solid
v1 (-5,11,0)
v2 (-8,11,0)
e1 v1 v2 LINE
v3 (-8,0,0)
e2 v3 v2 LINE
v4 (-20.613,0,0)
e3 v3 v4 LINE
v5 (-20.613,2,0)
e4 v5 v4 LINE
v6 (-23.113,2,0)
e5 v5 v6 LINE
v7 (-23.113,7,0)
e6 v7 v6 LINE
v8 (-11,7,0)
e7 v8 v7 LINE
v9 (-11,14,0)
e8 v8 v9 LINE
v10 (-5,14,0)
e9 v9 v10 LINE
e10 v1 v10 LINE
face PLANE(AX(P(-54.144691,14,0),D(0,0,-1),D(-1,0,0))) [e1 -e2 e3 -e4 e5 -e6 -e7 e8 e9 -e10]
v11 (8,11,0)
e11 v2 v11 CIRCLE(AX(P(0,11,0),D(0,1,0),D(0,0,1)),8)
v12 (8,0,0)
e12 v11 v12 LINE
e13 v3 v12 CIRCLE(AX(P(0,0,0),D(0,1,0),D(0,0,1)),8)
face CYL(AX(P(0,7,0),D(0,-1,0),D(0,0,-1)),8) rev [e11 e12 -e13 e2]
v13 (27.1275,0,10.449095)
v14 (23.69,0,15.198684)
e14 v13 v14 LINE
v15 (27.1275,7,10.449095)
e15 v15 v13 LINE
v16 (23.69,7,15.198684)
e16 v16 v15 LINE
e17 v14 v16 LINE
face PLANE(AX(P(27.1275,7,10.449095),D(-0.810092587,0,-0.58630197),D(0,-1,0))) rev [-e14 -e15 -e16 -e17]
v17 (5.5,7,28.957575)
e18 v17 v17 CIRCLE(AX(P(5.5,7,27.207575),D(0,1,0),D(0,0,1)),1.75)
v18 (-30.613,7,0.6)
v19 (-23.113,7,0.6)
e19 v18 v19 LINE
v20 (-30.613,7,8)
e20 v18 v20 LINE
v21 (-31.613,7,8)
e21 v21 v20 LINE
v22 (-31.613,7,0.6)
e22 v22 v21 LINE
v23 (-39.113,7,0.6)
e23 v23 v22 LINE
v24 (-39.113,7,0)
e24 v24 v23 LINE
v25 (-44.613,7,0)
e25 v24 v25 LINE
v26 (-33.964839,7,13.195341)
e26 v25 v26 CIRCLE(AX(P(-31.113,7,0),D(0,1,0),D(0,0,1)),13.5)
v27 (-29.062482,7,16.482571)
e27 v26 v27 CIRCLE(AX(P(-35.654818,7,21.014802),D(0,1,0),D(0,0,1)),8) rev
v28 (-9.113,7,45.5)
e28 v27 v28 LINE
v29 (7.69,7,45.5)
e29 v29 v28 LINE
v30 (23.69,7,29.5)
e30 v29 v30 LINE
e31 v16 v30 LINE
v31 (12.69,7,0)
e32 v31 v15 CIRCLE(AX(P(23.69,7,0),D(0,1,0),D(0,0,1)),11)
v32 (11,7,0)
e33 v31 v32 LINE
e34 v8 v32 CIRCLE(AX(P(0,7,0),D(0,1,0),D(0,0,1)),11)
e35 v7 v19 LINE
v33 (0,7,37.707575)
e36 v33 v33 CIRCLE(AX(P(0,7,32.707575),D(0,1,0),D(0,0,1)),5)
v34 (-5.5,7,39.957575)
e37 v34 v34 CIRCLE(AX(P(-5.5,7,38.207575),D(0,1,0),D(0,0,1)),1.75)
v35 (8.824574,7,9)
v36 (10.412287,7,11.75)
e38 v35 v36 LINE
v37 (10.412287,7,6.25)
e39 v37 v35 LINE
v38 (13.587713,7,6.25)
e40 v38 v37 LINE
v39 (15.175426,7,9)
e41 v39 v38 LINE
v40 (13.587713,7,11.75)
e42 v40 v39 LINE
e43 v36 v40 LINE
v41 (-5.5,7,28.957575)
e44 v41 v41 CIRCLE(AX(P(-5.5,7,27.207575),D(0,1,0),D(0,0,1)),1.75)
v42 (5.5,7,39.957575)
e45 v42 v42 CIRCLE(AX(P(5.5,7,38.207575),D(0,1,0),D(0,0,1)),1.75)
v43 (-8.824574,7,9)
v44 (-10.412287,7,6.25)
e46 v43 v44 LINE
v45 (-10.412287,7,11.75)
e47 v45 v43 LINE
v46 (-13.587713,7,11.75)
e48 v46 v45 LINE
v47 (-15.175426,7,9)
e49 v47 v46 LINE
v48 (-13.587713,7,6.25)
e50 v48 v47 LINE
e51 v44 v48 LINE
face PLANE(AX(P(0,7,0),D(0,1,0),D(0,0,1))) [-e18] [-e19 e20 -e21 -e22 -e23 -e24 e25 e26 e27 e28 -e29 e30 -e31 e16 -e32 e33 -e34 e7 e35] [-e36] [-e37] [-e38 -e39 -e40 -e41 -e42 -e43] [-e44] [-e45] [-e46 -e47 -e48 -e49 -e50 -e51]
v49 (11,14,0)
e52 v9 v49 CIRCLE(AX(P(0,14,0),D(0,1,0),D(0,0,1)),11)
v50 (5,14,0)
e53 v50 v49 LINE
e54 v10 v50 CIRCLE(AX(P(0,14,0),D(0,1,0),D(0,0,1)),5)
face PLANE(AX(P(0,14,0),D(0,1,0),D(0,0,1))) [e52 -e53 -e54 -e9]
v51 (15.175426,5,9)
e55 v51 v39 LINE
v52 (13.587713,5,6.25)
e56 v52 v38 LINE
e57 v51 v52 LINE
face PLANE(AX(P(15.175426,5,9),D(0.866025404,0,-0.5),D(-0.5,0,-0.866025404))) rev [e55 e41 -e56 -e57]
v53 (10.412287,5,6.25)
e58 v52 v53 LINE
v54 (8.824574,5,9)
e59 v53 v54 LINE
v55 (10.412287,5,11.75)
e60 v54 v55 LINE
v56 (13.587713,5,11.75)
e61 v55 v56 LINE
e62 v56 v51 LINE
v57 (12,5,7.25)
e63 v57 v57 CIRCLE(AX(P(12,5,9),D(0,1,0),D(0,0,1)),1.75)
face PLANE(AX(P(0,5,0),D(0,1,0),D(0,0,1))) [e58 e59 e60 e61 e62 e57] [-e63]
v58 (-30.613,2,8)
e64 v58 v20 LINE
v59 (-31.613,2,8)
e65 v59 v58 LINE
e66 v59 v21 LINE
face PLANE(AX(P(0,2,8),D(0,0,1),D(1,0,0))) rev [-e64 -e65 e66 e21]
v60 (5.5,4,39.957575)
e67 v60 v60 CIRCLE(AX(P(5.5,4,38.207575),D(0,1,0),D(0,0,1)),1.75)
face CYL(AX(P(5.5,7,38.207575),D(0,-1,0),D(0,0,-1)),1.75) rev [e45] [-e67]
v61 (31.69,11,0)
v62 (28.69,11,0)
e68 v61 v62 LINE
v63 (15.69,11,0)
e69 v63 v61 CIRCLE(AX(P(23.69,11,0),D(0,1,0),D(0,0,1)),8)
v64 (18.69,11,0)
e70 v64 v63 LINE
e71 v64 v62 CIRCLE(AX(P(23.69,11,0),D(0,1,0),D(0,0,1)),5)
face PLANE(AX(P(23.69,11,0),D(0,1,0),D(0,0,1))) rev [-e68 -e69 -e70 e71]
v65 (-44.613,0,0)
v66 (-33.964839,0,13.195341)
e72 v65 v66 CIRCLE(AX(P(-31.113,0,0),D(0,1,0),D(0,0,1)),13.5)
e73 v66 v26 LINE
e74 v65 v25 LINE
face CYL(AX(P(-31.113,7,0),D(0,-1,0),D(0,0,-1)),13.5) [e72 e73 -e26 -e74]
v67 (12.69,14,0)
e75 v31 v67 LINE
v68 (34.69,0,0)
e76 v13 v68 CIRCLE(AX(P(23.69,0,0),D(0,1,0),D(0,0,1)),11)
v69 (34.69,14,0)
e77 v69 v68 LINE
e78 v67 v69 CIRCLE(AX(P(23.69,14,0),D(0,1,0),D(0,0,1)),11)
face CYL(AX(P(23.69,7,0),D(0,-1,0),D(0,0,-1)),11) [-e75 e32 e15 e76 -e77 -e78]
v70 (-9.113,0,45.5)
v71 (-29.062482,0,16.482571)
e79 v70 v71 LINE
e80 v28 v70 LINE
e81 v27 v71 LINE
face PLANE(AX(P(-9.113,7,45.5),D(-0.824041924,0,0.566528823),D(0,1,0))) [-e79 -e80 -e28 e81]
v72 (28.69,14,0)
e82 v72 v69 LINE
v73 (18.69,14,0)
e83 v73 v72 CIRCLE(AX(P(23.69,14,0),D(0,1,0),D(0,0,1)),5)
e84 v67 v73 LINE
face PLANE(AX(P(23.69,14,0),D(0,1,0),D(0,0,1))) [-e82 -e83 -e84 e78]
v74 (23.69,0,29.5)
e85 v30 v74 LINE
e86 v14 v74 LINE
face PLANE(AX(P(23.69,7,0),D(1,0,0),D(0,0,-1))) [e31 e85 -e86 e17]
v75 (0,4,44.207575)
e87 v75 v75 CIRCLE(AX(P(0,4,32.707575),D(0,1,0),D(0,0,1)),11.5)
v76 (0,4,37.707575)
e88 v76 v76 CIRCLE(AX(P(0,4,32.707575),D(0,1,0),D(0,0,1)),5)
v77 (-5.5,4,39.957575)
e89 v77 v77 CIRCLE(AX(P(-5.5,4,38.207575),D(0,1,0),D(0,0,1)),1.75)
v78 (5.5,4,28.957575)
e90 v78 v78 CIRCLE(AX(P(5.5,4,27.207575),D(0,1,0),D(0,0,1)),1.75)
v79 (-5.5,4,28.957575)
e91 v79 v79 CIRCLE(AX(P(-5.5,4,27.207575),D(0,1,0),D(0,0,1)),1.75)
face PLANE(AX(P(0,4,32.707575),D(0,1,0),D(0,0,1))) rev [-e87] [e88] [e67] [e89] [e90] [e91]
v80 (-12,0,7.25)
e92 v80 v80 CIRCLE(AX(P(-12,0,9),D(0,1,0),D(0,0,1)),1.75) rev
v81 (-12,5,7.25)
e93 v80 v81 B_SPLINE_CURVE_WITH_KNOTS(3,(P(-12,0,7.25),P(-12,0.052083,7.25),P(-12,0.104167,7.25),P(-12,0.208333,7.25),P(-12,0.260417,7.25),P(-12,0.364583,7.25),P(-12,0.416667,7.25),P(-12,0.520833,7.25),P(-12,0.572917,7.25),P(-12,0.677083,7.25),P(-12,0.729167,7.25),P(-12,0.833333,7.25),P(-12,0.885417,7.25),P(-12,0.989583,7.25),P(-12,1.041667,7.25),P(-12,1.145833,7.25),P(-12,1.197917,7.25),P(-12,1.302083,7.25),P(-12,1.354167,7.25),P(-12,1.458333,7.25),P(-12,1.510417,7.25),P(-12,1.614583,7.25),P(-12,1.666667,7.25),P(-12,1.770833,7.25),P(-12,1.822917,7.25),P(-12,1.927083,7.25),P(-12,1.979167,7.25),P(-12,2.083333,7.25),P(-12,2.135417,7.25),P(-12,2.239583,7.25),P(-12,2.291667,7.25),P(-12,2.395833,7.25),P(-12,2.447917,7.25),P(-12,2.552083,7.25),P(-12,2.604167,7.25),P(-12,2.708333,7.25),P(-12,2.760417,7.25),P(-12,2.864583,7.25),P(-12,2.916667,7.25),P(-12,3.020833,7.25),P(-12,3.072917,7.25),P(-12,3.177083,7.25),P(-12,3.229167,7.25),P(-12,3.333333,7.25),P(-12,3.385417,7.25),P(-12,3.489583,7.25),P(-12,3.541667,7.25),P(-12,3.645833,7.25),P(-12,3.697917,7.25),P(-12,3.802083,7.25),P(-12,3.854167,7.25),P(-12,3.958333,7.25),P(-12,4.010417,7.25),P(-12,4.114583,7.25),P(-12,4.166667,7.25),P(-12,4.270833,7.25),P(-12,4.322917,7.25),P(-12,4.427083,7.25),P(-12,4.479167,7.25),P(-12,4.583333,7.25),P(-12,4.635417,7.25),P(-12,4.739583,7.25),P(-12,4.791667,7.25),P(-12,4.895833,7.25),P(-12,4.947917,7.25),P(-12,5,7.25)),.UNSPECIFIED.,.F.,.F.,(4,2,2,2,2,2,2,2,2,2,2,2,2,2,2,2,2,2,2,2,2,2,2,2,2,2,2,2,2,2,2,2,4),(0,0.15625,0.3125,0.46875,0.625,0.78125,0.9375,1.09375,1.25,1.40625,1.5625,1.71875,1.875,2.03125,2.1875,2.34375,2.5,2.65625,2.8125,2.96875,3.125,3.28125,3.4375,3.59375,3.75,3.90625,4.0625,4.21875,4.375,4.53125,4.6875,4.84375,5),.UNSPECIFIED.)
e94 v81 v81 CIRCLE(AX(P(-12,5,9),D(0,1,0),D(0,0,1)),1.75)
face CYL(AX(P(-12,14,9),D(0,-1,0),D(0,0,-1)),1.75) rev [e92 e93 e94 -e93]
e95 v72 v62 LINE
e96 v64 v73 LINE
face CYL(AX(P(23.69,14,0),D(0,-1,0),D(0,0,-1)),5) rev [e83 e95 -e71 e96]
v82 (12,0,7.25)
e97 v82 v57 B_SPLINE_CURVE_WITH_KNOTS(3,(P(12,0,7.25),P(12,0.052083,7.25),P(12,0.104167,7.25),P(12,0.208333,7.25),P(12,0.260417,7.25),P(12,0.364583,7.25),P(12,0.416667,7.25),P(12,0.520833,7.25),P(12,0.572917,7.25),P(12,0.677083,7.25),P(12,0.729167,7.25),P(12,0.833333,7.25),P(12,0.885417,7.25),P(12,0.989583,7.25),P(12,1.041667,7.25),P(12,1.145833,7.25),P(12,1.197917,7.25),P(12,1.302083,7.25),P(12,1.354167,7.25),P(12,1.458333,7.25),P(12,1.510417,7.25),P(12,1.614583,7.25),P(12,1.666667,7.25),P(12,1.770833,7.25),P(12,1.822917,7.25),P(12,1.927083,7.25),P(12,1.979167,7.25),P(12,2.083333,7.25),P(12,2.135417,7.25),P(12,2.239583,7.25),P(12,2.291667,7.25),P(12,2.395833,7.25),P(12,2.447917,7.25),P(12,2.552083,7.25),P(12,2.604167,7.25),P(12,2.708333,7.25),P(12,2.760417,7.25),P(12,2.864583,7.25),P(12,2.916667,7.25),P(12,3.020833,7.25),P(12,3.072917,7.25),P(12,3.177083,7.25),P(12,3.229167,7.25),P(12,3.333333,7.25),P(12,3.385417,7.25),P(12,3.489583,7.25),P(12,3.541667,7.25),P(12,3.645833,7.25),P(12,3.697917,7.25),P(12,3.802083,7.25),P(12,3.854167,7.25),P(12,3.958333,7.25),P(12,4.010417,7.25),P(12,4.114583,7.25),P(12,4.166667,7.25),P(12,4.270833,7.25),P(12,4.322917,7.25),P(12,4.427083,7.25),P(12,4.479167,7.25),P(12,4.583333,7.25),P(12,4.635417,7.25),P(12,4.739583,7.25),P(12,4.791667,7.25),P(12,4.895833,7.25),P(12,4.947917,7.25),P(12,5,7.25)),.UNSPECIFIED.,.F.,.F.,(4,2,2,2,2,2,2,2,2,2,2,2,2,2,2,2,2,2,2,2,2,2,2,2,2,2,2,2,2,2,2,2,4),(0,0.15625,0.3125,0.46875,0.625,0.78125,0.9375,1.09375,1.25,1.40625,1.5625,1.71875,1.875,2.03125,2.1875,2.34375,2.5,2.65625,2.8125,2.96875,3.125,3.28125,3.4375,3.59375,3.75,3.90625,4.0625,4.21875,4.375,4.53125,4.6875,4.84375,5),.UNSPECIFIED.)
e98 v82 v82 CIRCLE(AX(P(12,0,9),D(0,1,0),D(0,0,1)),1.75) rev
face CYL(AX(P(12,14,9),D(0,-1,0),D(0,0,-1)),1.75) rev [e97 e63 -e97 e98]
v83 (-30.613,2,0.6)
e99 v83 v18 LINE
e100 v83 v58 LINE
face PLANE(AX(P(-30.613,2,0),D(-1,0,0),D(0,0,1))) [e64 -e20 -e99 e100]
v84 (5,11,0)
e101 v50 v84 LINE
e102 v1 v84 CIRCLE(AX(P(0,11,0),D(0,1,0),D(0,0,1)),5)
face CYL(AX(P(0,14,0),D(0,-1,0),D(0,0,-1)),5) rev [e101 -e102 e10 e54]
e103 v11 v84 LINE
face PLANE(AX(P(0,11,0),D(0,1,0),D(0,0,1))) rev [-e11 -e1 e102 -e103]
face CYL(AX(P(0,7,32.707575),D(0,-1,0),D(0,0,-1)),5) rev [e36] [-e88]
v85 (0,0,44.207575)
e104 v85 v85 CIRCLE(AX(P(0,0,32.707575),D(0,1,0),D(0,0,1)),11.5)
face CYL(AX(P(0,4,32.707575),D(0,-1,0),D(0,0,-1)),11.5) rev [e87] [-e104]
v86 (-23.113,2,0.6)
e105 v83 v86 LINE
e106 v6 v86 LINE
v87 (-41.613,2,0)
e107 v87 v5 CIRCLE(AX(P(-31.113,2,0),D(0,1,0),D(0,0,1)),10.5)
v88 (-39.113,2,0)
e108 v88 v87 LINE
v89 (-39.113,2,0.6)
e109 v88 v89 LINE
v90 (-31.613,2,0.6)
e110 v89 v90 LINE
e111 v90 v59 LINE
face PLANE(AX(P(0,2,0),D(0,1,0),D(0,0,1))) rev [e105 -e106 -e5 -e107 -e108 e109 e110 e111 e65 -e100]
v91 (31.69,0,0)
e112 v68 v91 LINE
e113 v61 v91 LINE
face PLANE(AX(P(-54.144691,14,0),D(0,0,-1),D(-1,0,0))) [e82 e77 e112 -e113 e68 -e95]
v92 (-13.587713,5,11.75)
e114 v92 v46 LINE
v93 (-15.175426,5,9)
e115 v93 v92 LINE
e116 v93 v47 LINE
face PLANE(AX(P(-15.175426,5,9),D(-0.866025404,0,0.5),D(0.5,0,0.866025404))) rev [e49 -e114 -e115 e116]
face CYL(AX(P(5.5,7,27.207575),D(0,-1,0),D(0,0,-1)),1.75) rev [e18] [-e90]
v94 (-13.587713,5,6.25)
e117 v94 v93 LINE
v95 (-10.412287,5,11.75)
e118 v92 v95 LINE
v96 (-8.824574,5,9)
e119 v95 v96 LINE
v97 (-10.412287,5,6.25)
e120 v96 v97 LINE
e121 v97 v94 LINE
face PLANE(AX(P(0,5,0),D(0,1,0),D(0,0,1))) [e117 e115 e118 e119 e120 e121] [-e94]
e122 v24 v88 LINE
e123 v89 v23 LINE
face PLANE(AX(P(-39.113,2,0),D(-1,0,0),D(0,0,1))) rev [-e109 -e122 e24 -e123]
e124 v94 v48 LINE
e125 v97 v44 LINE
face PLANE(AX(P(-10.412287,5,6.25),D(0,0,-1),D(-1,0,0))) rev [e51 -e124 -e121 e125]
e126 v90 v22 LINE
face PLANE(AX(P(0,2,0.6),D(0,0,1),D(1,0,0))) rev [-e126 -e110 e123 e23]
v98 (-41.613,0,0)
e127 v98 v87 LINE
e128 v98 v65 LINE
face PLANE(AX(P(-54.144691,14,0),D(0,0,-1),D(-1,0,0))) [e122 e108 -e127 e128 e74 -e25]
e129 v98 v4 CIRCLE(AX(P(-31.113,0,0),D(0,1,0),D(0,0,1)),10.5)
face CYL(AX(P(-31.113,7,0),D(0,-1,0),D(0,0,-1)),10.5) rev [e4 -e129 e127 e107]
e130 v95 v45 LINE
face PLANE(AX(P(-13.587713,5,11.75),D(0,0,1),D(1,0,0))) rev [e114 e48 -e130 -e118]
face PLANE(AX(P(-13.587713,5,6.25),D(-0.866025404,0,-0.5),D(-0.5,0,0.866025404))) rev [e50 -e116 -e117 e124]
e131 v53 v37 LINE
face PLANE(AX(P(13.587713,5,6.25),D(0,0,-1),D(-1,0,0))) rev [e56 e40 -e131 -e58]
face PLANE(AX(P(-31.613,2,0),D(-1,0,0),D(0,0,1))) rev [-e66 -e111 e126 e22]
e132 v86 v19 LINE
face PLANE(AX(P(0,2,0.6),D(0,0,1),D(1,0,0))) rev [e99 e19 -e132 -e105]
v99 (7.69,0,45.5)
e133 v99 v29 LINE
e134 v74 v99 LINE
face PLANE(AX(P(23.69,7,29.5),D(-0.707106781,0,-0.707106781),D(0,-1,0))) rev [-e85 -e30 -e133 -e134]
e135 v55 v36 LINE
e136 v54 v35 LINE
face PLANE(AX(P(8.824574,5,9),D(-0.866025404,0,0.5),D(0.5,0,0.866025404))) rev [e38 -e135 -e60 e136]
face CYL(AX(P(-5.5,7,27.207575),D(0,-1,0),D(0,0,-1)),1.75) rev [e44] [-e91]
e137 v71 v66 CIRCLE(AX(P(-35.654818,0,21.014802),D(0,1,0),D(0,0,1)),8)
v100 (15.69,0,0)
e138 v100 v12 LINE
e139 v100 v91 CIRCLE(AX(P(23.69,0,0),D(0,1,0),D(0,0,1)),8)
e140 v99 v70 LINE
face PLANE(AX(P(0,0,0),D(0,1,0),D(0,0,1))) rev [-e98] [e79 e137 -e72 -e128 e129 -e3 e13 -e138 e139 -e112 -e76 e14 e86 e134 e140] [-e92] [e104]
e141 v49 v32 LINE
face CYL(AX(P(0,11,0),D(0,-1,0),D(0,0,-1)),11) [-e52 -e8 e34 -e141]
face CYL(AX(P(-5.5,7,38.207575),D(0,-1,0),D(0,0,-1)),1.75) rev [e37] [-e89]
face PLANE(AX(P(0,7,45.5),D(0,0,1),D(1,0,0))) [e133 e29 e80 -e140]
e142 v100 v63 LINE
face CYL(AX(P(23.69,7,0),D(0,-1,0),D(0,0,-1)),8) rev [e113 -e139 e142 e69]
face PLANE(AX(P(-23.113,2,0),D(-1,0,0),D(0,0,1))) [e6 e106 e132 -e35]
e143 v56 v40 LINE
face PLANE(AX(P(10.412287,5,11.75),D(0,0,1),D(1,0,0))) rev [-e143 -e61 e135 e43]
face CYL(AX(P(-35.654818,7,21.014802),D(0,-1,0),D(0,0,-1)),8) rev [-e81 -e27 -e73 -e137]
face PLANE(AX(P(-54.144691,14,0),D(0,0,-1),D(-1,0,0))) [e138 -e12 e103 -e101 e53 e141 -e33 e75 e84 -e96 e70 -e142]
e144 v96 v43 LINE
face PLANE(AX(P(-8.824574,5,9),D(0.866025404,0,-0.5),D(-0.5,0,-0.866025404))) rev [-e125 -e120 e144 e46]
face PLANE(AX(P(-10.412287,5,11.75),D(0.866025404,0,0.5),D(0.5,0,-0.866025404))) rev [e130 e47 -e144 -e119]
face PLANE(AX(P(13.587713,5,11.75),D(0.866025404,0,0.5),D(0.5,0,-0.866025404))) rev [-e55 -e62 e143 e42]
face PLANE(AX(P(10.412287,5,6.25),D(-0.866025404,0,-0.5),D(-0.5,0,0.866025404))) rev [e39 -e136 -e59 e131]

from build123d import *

# Parameters (mm, degrees)
SKETCH3_R               = 8
SKETCH3_R_2             = 5.000000000000001
BOSS_EXTRUDE1_DEPTH     = 7
CUT_EXTRUDE3_DEPTH      = 65.10592616131524
CUT_EXTRUDE3_DEPTH_BACK = 65.10592616131524
SKETCH4_R               = 1.7500000000000004
SKETCH4_R_2             = 1.7500000000000013
SKETCH6_R               = 10.999999999999993
SKETCH6_R_2             = 7.999999999999998
SKETCH6_R_3             = 11
SKETCH6_R_4             = 8
BOSS_EXTRUDE2_DEPTH     = 4
SKETCH7_R               = 10.999999999999993
SKETCH7_R_2             = 5.000000000000001
SKETCH7_R_3             = 11
SKETCH7_R_4             = 5
BOSS_EXTRUDE3_DEPTH     = 3
CHAMFER1_SIZE           = 2.5
CUT_EXTRUDE5_DEPTH      = 66.242392422412
CUT_EXTRUDE5_DEPTH_BACK = 66.242392422412
SKETCH9_R               = 1.7499999999999998
CUT_EXTRUDE6_START      = -2
SKETCH10_R              = 1.7499999999999998
CUT_EXTRUDE6_DEPTH      = 2
CHAMFER3_SIZE2          = 32
CHAMFER3_SIZE           = 22
CHAMFER4_SIZE           = 16
FILLET1_DEPTH           = 7
BOSS_EXTRUDE6_START     = -5
SKETCH15_R              = 10.499999999999996
BOSS_EXTRUDE6_DEPTH     = 5
CUT_EXTRUDE7_DEPTH      = 66.24239242241201
CUT_EXTRUDE7_DEPTH_BACK = 66.24239242241201
SKETCH16_W              = 93.91132691471782
SKETCH16_H              = 20.326896629745406
SKETCH17_R              = 11.5
SKETCH17_R_2            = 5.0000000000000036
CUT_EXTRUDE8_DEPTH      = 4


with BuildPart() as part:
    # Sketch3 → Boss-Extrude1 (new body)
    # profile 1 of 10: a face of its own
    with BuildSketch(Plane(origin=(0, 0, 0), x_dir=(1, 0, 0), z_dir=(0, 1, 0))):
        with BuildLine():
            ThreePointArc((-17.613, 0), (-21.567058453981605, 9.545941546018392), (-31.113, 13.500000000000002))
            Line((-31.113, 13.5), (-31.113, 10.499999999999996))
            ThreePointArc((-31.11300000000032, 10.499999999999996), (-23.688378797541365, 7.424621202458859), (-20.613000000000003, 0))
            ThreePointArc((-20.613000000000003, -2.57e-15), (-23.688378797541368, -7.4246212024588605), (-31.11300000000031, -10.499999999999996))
            Line((-31.112999999999992, -10.499999999999996), (-31.112999999999992, -13.500000000000007))
            ThreePointArc((-31.11299999999999, -13.500000000000002), (-21.567058453981602, -9.545941546018385), (-17.613, -3.31e-15))
        make_face()
    # profile 2 of 10: a face of its own
    with BuildSketch(Plane(origin=(0, 0, 0), x_dir=(1, 0, 0), z_dir=(0, 1, 0))):
        with BuildLine():
            Line((-31.113, 10.499999999999996), (-31.113, 13.5))
            ThreePointArc((-31.113, 13.500000000000002), (-44.613, -4.34e-15), (-31.11299999999999, -13.500000000000002))
            Line((-31.112999999999992, -13.500000000000007), (-31.112999999999992, -10.499999999999996))
            ThreePointArc((-31.11300000000031, -10.499999999999996), (-41.613, -8.04e-15), (-31.11300000000032, 10.499999999999996))
        make_face()
    # profile 3 of 10: a face of its own
    with BuildSketch(Plane(origin=(0, 0, 0), x_dir=(1, 0, 0), z_dir=(0, 1, 0))):
        with BuildLine():
            Line((23.690000000000005, 13.500000000000002), (-31.113, 13.5))
            ThreePointArc((-31.113, 13.500000000000002), (-21.567058453981605, 9.545941546018392), (-17.613, 0))
            ThreePointArc((-17.613, -3.31e-15), (-21.567058453981602, -9.545941546018385), (-31.11299999999999, -13.500000000000002))
            Line((-31.112999999999992, -13.500000000000005), (23.690000000000005, -13.499999999999998))
            Line((23.690000000000005, -13.499999999999998), (23.690000000000005, -10.999999999999991))
            ThreePointArc((23.689999999999998, -10.999999999999993), (12.690000000000008, 1.112e-14), (23.690000000000015, 10.999999999999993))
            Line((23.690000000000005, 10.999999999999993), (23.690000000000005, 13.500000000000002))
        make_face()
        with Locations(Location((0, 0, 0), (0, 0, 270))):
            Circle(SKETCH3_R, mode=Mode.SUBTRACT)
    # profile 4 of 10: a face of its own
    with BuildSketch(Plane(origin=(0, 0, 0), x_dir=(1, 0, 0), z_dir=(0, 1, 0))):
        with BuildLine():
            ThreePointArc((-17.613, 0), (-21.567058453981605, 9.545941546018392), (-31.113, 13.500000000000002))
            Line((-31.113, 13.5), (-31.113, 10.499999999999996))
            ThreePointArc((-31.11300000000032, 10.499999999999996), (-23.688378797541365, 7.424621202458859), (-20.613000000000003, 0))
            ThreePointArc((-20.613000000000003, -2.57e-15), (-23.688378797541368, -7.4246212024588605), (-31.11300000000031, -10.499999999999996))
            Line((-31.112999999999992, -10.499999999999996), (-31.112999999999992, -13.500000000000007))
            ThreePointArc((-31.11299999999999, -13.500000000000002), (-21.567058453981602, -9.545941546018385), (-17.613, -3.31e-15))
        make_face()
    # profile 5 of 10: a face of its own
    with BuildSketch(Plane(origin=(0, 0, 0), x_dir=(1, 0, 0), z_dir=(0, 1, 0))):
        with BuildLine():
            Line((-31.113, 10.499999999999996), (-31.113, 13.5))
            ThreePointArc((-31.113, 13.500000000000002), (-44.613, -4.34e-15), (-31.11299999999999, -13.500000000000002))
            Line((-31.112999999999992, -13.500000000000007), (-31.112999999999992, -10.499999999999996))
            ThreePointArc((-31.11300000000031, -10.499999999999996), (-41.613, -8.04e-15), (-31.11300000000032, 10.499999999999996))
        make_face()
    # profile 6 of 10: a face of its own
    with BuildSketch(Plane(origin=(0, 0, 0), x_dir=(1, 0, 0), z_dir=(0, 1, 0))):
        with BuildLine():
            ThreePointArc((34.69, 0), (31.468174593052026, 7.778174593052012), (23.690000000000015, 10.999999999999993))
            Line((23.690000000000005, 10.999999999999993), (23.690000000000005, 7.999999999999998))
            ThreePointArc((23.689999999999863, 7.999999999999998), (29.34685424949233, 5.6568542494924285), (31.689999999999998, 0))
            ThreePointArc((31.689999999999998, -1.96e-15), (29.34685424949233, -5.65685424949243), (23.68999999999986, -7.999999999999998))
            Line((23.690000000000005, -7.999999999999998), (23.690000000000005, -10.999999999999991))
            ThreePointArc((23.689999999999998, -10.999999999999993), (31.468174593052016, -7.77817459305202), (34.69, -2.69e-15))
        make_face()
    # profile 7 of 10: a face of its own
    with BuildSketch(Plane(origin=(0, 0, 0), x_dir=(1, 0, 0), z_dir=(0, 1, 0))):
        with BuildLine():
            Line((23.690000000000005, 7.999999999999998), (23.690000000000005, 10.999999999999993))
            ThreePointArc((23.690000000000015, 10.999999999999993), (12.690000000000008, 1.112e-14), (23.689999999999998, -10.999999999999993))
            Line((23.690000000000005, -10.999999999999991), (23.690000000000005, -7.999999999999998))
            ThreePointArc((23.68999999999986, -7.999999999999998), (15.690000000000003, 9.8e-16), (23.689999999999863, 7.999999999999998))
        make_face()
    # profile 8 of 10: a face of its own
    with BuildSketch(Plane(origin=(0, 0, 0), x_dir=(1, 0, 0), z_dir=(0, 1, 0))):
        Polygon((-31.112999999999992, -13.500000000000005), (23.690000000000005, -13.499999999999998), (23.690000000000005, -45.5), (-31.11299999999999, -45.5), align=None)
        with Locations(Location((0, -32.70757493091458, 0), (0, 0, 270))):
            Circle(SKETCH3_R_2, mode=Mode.SUBTRACT)
    # profile 9 of 10: a face of its own
    with BuildSketch(Plane(origin=(0, 0, 0), x_dir=(1, 0, 0), z_dir=(0, 1, 0))):
        with BuildLine():
            ThreePointArc((34.69, 0), (31.468174593052026, 7.778174593052012), (23.690000000000015, 10.999999999999993))
            Line((23.690000000000005, 10.999999999999993), (23.690000000000005, 7.999999999999998))
            ThreePointArc((23.689999999999863, 7.999999999999998), (29.34685424949233, 5.6568542494924285), (31.689999999999998, 0))
            ThreePointArc((31.689999999999998, -1.96e-15), (29.34685424949233, -5.65685424949243), (23.68999999999986, -7.999999999999998))
            Line((23.690000000000005, -7.999999999999998), (23.690000000000005, -10.999999999999991))
            ThreePointArc((23.689999999999998, -10.999999999999993), (31.468174593052016, -7.77817459305202), (34.69, -2.69e-15))
        make_face()
    # profile 10 of 10: a face of its own
    with BuildSketch(Plane(origin=(0, 0, 0), x_dir=(1, 0, 0), z_dir=(0, 1, 0))):
        with BuildLine():
            Line((23.690000000000005, 7.999999999999998), (23.690000000000005, 10.999999999999993))
            ThreePointArc((23.690000000000015, 10.999999999999993), (12.690000000000008, 1.112e-14), (23.689999999999998, -10.999999999999993))
            Line((23.690000000000005, -10.999999999999991), (23.690000000000005, -7.999999999999998))
            ThreePointArc((23.68999999999986, -7.999999999999998), (15.690000000000003, 9.8e-16), (23.689999999999863, 7.999999999999998))
        make_face()
    extrude(amount=BOSS_EXTRUDE1_DEPTH)

    # Sketch4 → Cut-Extrude3 (cut, two sides: drawn at the far end of the back side and taken through both)
    with BuildSketch(Plane(origin=(0, 0, 0), x_dir=(1, 0, 0), z_dir=(0, 1, 0)).offset(-CUT_EXTRUDE3_DEPTH_BACK)):
        with Locations(Location((5.5, -27.207574930914586, 0), (0, 0, 270))):
            Circle(SKETCH4_R)
        with Locations(Location((5.5, -38.20757493091458, 0), (0, 0, 270))):
            Circle(SKETCH4_R_2)
        with Locations(Location((-5.5, -38.20757493091458, 0), (0, 0, 270))):
            Circle(SKETCH4_R_2)
        with Locations(Location((-5.5, -27.207574930914586, 0), (0, 0, 270))):
            Circle(SKETCH4_R)
    extrude(amount=CUT_EXTRUDE3_DEPTH + CUT_EXTRUDE3_DEPTH_BACK, mode=Mode.SUBTRACT)

    # Sketch6 → Boss-Extrude2 (add)
    # profile 1 of 2: a face of its own
    with BuildSketch(Plane(origin=(0, 7, 0), x_dir=(1, 0, 0), z_dir=(0, 1, 0))):
        with Locations(Location((23.69, 0, 0), (0, 0, 270))):
            Circle(SKETCH6_R)
        with Locations(Location((23.69, 0, 0), (0, 0, 270))):
            Circle(SKETCH6_R_2, mode=Mode.SUBTRACT)
    # profile 2 of 2: a face of its own
    with BuildSketch(Plane(origin=(0, 7, 0), x_dir=(1, 0, 0), z_dir=(0, 1, 0))):
        with Locations(Location((0, 0, 0), (0, 0, 270))):
            Circle(SKETCH6_R_3)
        with Locations(Location((0, 0, 0), (0, 0, 270))):
            Circle(SKETCH6_R_4, mode=Mode.SUBTRACT)
    extrude(amount=BOSS_EXTRUDE2_DEPTH)

    # Sketch7 → Boss-Extrude3 (add)
    # profile 1 of 2: a face of its own
    with BuildSketch(Plane(origin=(0, 11, 0), x_dir=(1, 0, 0), z_dir=(0, 1, 0))):
        with Locations(Location((23.69, 0, 0), (0, 0, 270))):
            Circle(SKETCH7_R)
        with Locations(Location((23.69, 0, 0), (0, 0, 270))):
            Circle(SKETCH7_R_2, mode=Mode.SUBTRACT)
    # profile 2 of 2: a face of its own
    with BuildSketch(Plane(origin=(0, 11, 0), x_dir=(1, 0, 0), z_dir=(0, 1, 0))):
        with Locations(Location((0, 0, 0), (0, 0, 270))):
            Circle(SKETCH7_R_3)
        with Locations(Location((0, 0, 0), (0, 0, 270))):
            Circle(SKETCH7_R_4, mode=Mode.SUBTRACT)
    extrude(amount=BOSS_EXTRUDE3_DEPTH)

    # Chamfer1
    # the kernel refuses this chamfer: 2.5 mm, written as the material it adds along each edge
    with BuildSketch(Plane(origin=(23.690000000000012, 0, -10.999999999999993), x_dir=(0.9912092295509807, 0, 0.13230367815352426), z_dir=(0, 1, 0))) as chamfer1_piece_1_section:
        with BuildLine():
            Line((2.910680919377515, 1e-17), (-CHAMFER1_SIZE * 0.132303678154, CHAMFER1_SIZE * 0.991209229551))
            Line((-CHAMFER1_SIZE * 0.132303678154, CHAMFER1_SIZE * 0.991209229551), (0, 0))
            ThreePointArc((0, 0), (1.4955265802521478, 0.09662506904492212), (2.910680919377515, 1e-17))
        make_face()
    chamfer1_piece_1 = extrude(amount=7, mode=Mode.PRIVATE)
    chamfer1_piece_1 = split(chamfer1_piece_1, bisect_by=Plane(origin=(23.690000000000012, 0, -13.500000000000002), z_dir=(3e-17, 0, 1)), keep=Keep.TOP, mode=Mode.PRIVATE)
    add(chamfer1_piece_1)

    # Sketch9 → Cut-Extrude5 (cut, two sides: drawn at the far end of the back side and taken through both)
    with BuildSketch(Plane(origin=(0, 0, 0), x_dir=(1, 0, 0), z_dir=(0, 1, 0)).offset(-CUT_EXTRUDE5_DEPTH_BACK)):
        with Locations(Location((12, 9, 0), (0, 0, 90))):
            Circle(SKETCH9_R)
        with Locations(Location((12, -9, 0), (0, 0, 90))):
            Circle(SKETCH9_R)
        with Locations(Location((-12, -9, 0), (0, 0, 90))):
            Circle(SKETCH9_R)
        with Locations(Location((-12, 9, 0), (0, 0, 90))):
            Circle(SKETCH9_R)
    extrude(amount=CUT_EXTRUDE5_DEPTH + CUT_EXTRUDE5_DEPTH_BACK, mode=Mode.SUBTRACT)

    # Sketch10 → Cut-Extrude6 (cut)
    # profile 1 of 4: a face of its own
    with BuildSketch(Plane(origin=(0, 7, 0), x_dir=(1, 0, 0), z_dir=(0, 1, 0)).offset(CUT_EXTRUDE6_START)):
        Polygon((-15.17542648054294, -9.000000000000002), (-13.587713240271471, -11.749999999999998), (-10.412286759728527, -11.749999999999998), (-8.824573519457056, -8.999999999999998), (-10.412286759728529, -6.249999999999998), (-13.58771324027147, -6.249999999999998), align=None)
        with Locations(Location((-12, -9, 0), (0, 0, 90))):
            Circle(SKETCH10_R, mode=Mode.SUBTRACT)
    # profile 2 of 4: a face of its own
    with BuildSketch(Plane(origin=(0, 7, 0), x_dir=(1, 0, 0), z_dir=(0, 1, 0)).offset(CUT_EXTRUDE6_START)):
        Polygon((-15.17542648054294, 8.999999999999998), (-13.587713240271473, 6.249999999999999), (-10.41228675972853, 6.249999999999999), (-8.824573519457058, 9), (-10.412286759728529, 11.75), (-13.587713240271468, 11.75), align=None)
        with Locations(Location((-12, 9, 0), (0, 0, 90))):
            Circle(SKETCH10_R, mode=Mode.SUBTRACT)
    # profile 3 of 4: a face of its own
    with BuildSketch(Plane(origin=(0, 7, 0), x_dir=(1, 0, 0), z_dir=(0, 1, 0)).offset(CUT_EXTRUDE6_START)):
        Polygon((15.175426480542939, 8.999999999999998), (13.587713240271471, 11.749999999999996), (10.412286759728532, 11.749999999999996), (8.82457351945706, 8.999999999999995), (10.412286759728527, 6.249999999999997), (13.58771324027147, 6.249999999999997), align=None)
        with Locations(Location((12, 9, 0), (0, 0, 90))):
            Circle(SKETCH10_R, mode=Mode.SUBTRACT)
    # profile 4 of 4: a face of its own
    with BuildSketch(Plane(origin=(0, 7, 0), x_dir=(1, 0, 0), z_dir=(0, 1, 0)).offset(CUT_EXTRUDE6_START)):
        Polygon((15.17542648054294, -9.000000000000002), (13.58771324027147, -6.249999999999999), (10.41228675972853, -6.249999999999999), (8.824573519457058, -9.000000000000002), (10.41228675972853, -11.75), (13.587713240271471, -11.75), align=None)
        with Locations(Location((12, -9, 0), (0, 0, 90))):
            Circle(SKETCH10_R, mode=Mode.SUBTRACT)
    extrude(amount=CUT_EXTRUDE6_DEPTH, mode=Mode.SUBTRACT)

    # Chamfer2
    # the kernel refuses this chamfer: 5 mm, written as the material it adds along each edge
    with BuildSketch(Plane(origin=(23.69, 0, 10.999999999999993), x_dir=(0.9874000606639179, 0, -0.15824386307497393), z_dir=(0, 1, 0))) as chamfer2_piece_1:
        with BuildLine():
            Line((3.622786343886572, 0.1414213562374673), (-0.8058373565311953, -4.287202344190177))
            Line((-0.8058373565311953, -4.287202344190177), (-0.9045773625975885, -4.27137795788268))
            ThreePointArc((-0.9045773625975885, -4.27137795788268), (-0.4437672242597131, -2.1370546546533555), (-0.0987400060663932, 0.01582438630749762))
            Line((-0.0987400060663932, 0.01582438630749762), (0.01582438630749734, 0.09874000606639144))
            ThreePointArc((0.01582438630749734, 0.09874000606639144), (1.8121079396960726, -0.03836531209673867), (3.6069619575790735, 0.24016136230385873))
            Line((3.6069619575790735, 0.24016136230385873), (3.622786343886572, 0.1414213562374673))
        make_face()
    extrude(amount=7)

    # Chamfer3
    chamfer3_edges = [part.edges().sort_by_distance(p)[0] for p in [
        (-31.11299999999999, 3.5, 45.5),
    ]]
    chamfer3_side = [part.faces().sort_by_distance(p)[0] for p in [
        (-30.672999999999988, 3.5, 45.5),
    ]]
    chamfer(chamfer3_edges, length=CHAMFER3_SIZE - 0.0001, length2=CHAMFER3_SIZE2 - 0.0001, reference=chamfer3_side[0])  # a hair under: the kernel refuses the full size

    # Chamfer4
    chamfer4_edges = [part.edges().sort_by_distance(p)[0] for p in [
        (23.690000000000005, 3.5, 45.5),
    ]]
    chamfer(chamfer4_edges, length=CHAMFER4_SIZE)

    # Fillet1: read off the stored shape, not the designer's step
    # Fillet1 outline → Fillet1 (add)
    with BuildSketch(Plane(origin=(0, 0, 0), x_dir=(1, 0, 0), z_dir=(0, 1, 0))):
        with BuildLine():
            ThreePointArc((-31.113, -13.5), (-32.547033058, -13.423619079), (-33.96483904, -13.19534062))
            ThreePointArc((-33.96483904, -13.19534062), (-31.199410591, -14.370304214), (-29.062482337, -16.482571146))
            Line((-29.062482337, -16.482571146), (-31.113, -13.5))
        make_face()
    extrude(amount=FILLET1_DEPTH)

    # Sketch15 → Boss-Extrude6 (add)
    with BuildSketch(Plane(origin=(0, 7, 0), x_dir=(1, 0, 0), z_dir=(0, 1, 0)).offset(BOSS_EXTRUDE6_START)):
        with Locations(Location((-31.113, 0, 0), (0, 0, 270))):
            Circle(SKETCH15_R)
        Polygon((-31.613000000000003, 0.5999999999999996), (-31.613000000000003, 7.999999999999978), (-30.613, 7.999999999999978), (-30.613, 0.5999999999999996), (-23.112999999999996, 0.5999999999999999), (-23.112999999999996, -0.6000000000000001), (-30.613, -0.6000000000000001), (-30.612999999999996, -8.000000000000021), (-31.613000000000003, -8.000000000000023), (-31.613000000000003, -0.6000000000000005), (-39.11299999999999, -0.6000000000000001), (-39.11299999999999, 0.5999999999999999), align=None, mode=Mode.SUBTRACT)
    extrude(amount=BOSS_EXTRUDE6_DEPTH)

    # Sketch16 → Cut-Extrude7 (cut, two sides: drawn at the far end of the back side and taken through both)
    with BuildSketch(Plane(origin=(0, 0, 0), x_dir=(1, 0, 0), z_dir=(0, 1, 0)).offset(-CUT_EXTRUDE7_DEPTH_BACK)):
        with Locations((-7.1890270506767, 10.163448314872703)):
            Rectangle(SKETCH16_W, SKETCH16_H)
    extrude(amount=CUT_EXTRUDE7_DEPTH + CUT_EXTRUDE7_DEPTH_BACK, mode=Mode.SUBTRACT)

    # Sketch17 → Cut-Extrude8 (cut)
    with BuildSketch(Plane(origin=(0, 0, 0), x_dir=(1, 0, 0), z_dir=(0, 1, 0))):
        with Locations(Location((0, -32.70757493091458, 0), (0, 0, 270))):
            Circle(SKETCH17_R)
        with Locations(Location((0, -32.70757493091458, 0), (0, 0, 270))):
            Circle(SKETCH17_R_2, mode=Mode.SUBTRACT)
    extrude(amount=CUT_EXTRUDE8_DEPTH, mode=Mode.SUBTRACT)


solid = part.part
